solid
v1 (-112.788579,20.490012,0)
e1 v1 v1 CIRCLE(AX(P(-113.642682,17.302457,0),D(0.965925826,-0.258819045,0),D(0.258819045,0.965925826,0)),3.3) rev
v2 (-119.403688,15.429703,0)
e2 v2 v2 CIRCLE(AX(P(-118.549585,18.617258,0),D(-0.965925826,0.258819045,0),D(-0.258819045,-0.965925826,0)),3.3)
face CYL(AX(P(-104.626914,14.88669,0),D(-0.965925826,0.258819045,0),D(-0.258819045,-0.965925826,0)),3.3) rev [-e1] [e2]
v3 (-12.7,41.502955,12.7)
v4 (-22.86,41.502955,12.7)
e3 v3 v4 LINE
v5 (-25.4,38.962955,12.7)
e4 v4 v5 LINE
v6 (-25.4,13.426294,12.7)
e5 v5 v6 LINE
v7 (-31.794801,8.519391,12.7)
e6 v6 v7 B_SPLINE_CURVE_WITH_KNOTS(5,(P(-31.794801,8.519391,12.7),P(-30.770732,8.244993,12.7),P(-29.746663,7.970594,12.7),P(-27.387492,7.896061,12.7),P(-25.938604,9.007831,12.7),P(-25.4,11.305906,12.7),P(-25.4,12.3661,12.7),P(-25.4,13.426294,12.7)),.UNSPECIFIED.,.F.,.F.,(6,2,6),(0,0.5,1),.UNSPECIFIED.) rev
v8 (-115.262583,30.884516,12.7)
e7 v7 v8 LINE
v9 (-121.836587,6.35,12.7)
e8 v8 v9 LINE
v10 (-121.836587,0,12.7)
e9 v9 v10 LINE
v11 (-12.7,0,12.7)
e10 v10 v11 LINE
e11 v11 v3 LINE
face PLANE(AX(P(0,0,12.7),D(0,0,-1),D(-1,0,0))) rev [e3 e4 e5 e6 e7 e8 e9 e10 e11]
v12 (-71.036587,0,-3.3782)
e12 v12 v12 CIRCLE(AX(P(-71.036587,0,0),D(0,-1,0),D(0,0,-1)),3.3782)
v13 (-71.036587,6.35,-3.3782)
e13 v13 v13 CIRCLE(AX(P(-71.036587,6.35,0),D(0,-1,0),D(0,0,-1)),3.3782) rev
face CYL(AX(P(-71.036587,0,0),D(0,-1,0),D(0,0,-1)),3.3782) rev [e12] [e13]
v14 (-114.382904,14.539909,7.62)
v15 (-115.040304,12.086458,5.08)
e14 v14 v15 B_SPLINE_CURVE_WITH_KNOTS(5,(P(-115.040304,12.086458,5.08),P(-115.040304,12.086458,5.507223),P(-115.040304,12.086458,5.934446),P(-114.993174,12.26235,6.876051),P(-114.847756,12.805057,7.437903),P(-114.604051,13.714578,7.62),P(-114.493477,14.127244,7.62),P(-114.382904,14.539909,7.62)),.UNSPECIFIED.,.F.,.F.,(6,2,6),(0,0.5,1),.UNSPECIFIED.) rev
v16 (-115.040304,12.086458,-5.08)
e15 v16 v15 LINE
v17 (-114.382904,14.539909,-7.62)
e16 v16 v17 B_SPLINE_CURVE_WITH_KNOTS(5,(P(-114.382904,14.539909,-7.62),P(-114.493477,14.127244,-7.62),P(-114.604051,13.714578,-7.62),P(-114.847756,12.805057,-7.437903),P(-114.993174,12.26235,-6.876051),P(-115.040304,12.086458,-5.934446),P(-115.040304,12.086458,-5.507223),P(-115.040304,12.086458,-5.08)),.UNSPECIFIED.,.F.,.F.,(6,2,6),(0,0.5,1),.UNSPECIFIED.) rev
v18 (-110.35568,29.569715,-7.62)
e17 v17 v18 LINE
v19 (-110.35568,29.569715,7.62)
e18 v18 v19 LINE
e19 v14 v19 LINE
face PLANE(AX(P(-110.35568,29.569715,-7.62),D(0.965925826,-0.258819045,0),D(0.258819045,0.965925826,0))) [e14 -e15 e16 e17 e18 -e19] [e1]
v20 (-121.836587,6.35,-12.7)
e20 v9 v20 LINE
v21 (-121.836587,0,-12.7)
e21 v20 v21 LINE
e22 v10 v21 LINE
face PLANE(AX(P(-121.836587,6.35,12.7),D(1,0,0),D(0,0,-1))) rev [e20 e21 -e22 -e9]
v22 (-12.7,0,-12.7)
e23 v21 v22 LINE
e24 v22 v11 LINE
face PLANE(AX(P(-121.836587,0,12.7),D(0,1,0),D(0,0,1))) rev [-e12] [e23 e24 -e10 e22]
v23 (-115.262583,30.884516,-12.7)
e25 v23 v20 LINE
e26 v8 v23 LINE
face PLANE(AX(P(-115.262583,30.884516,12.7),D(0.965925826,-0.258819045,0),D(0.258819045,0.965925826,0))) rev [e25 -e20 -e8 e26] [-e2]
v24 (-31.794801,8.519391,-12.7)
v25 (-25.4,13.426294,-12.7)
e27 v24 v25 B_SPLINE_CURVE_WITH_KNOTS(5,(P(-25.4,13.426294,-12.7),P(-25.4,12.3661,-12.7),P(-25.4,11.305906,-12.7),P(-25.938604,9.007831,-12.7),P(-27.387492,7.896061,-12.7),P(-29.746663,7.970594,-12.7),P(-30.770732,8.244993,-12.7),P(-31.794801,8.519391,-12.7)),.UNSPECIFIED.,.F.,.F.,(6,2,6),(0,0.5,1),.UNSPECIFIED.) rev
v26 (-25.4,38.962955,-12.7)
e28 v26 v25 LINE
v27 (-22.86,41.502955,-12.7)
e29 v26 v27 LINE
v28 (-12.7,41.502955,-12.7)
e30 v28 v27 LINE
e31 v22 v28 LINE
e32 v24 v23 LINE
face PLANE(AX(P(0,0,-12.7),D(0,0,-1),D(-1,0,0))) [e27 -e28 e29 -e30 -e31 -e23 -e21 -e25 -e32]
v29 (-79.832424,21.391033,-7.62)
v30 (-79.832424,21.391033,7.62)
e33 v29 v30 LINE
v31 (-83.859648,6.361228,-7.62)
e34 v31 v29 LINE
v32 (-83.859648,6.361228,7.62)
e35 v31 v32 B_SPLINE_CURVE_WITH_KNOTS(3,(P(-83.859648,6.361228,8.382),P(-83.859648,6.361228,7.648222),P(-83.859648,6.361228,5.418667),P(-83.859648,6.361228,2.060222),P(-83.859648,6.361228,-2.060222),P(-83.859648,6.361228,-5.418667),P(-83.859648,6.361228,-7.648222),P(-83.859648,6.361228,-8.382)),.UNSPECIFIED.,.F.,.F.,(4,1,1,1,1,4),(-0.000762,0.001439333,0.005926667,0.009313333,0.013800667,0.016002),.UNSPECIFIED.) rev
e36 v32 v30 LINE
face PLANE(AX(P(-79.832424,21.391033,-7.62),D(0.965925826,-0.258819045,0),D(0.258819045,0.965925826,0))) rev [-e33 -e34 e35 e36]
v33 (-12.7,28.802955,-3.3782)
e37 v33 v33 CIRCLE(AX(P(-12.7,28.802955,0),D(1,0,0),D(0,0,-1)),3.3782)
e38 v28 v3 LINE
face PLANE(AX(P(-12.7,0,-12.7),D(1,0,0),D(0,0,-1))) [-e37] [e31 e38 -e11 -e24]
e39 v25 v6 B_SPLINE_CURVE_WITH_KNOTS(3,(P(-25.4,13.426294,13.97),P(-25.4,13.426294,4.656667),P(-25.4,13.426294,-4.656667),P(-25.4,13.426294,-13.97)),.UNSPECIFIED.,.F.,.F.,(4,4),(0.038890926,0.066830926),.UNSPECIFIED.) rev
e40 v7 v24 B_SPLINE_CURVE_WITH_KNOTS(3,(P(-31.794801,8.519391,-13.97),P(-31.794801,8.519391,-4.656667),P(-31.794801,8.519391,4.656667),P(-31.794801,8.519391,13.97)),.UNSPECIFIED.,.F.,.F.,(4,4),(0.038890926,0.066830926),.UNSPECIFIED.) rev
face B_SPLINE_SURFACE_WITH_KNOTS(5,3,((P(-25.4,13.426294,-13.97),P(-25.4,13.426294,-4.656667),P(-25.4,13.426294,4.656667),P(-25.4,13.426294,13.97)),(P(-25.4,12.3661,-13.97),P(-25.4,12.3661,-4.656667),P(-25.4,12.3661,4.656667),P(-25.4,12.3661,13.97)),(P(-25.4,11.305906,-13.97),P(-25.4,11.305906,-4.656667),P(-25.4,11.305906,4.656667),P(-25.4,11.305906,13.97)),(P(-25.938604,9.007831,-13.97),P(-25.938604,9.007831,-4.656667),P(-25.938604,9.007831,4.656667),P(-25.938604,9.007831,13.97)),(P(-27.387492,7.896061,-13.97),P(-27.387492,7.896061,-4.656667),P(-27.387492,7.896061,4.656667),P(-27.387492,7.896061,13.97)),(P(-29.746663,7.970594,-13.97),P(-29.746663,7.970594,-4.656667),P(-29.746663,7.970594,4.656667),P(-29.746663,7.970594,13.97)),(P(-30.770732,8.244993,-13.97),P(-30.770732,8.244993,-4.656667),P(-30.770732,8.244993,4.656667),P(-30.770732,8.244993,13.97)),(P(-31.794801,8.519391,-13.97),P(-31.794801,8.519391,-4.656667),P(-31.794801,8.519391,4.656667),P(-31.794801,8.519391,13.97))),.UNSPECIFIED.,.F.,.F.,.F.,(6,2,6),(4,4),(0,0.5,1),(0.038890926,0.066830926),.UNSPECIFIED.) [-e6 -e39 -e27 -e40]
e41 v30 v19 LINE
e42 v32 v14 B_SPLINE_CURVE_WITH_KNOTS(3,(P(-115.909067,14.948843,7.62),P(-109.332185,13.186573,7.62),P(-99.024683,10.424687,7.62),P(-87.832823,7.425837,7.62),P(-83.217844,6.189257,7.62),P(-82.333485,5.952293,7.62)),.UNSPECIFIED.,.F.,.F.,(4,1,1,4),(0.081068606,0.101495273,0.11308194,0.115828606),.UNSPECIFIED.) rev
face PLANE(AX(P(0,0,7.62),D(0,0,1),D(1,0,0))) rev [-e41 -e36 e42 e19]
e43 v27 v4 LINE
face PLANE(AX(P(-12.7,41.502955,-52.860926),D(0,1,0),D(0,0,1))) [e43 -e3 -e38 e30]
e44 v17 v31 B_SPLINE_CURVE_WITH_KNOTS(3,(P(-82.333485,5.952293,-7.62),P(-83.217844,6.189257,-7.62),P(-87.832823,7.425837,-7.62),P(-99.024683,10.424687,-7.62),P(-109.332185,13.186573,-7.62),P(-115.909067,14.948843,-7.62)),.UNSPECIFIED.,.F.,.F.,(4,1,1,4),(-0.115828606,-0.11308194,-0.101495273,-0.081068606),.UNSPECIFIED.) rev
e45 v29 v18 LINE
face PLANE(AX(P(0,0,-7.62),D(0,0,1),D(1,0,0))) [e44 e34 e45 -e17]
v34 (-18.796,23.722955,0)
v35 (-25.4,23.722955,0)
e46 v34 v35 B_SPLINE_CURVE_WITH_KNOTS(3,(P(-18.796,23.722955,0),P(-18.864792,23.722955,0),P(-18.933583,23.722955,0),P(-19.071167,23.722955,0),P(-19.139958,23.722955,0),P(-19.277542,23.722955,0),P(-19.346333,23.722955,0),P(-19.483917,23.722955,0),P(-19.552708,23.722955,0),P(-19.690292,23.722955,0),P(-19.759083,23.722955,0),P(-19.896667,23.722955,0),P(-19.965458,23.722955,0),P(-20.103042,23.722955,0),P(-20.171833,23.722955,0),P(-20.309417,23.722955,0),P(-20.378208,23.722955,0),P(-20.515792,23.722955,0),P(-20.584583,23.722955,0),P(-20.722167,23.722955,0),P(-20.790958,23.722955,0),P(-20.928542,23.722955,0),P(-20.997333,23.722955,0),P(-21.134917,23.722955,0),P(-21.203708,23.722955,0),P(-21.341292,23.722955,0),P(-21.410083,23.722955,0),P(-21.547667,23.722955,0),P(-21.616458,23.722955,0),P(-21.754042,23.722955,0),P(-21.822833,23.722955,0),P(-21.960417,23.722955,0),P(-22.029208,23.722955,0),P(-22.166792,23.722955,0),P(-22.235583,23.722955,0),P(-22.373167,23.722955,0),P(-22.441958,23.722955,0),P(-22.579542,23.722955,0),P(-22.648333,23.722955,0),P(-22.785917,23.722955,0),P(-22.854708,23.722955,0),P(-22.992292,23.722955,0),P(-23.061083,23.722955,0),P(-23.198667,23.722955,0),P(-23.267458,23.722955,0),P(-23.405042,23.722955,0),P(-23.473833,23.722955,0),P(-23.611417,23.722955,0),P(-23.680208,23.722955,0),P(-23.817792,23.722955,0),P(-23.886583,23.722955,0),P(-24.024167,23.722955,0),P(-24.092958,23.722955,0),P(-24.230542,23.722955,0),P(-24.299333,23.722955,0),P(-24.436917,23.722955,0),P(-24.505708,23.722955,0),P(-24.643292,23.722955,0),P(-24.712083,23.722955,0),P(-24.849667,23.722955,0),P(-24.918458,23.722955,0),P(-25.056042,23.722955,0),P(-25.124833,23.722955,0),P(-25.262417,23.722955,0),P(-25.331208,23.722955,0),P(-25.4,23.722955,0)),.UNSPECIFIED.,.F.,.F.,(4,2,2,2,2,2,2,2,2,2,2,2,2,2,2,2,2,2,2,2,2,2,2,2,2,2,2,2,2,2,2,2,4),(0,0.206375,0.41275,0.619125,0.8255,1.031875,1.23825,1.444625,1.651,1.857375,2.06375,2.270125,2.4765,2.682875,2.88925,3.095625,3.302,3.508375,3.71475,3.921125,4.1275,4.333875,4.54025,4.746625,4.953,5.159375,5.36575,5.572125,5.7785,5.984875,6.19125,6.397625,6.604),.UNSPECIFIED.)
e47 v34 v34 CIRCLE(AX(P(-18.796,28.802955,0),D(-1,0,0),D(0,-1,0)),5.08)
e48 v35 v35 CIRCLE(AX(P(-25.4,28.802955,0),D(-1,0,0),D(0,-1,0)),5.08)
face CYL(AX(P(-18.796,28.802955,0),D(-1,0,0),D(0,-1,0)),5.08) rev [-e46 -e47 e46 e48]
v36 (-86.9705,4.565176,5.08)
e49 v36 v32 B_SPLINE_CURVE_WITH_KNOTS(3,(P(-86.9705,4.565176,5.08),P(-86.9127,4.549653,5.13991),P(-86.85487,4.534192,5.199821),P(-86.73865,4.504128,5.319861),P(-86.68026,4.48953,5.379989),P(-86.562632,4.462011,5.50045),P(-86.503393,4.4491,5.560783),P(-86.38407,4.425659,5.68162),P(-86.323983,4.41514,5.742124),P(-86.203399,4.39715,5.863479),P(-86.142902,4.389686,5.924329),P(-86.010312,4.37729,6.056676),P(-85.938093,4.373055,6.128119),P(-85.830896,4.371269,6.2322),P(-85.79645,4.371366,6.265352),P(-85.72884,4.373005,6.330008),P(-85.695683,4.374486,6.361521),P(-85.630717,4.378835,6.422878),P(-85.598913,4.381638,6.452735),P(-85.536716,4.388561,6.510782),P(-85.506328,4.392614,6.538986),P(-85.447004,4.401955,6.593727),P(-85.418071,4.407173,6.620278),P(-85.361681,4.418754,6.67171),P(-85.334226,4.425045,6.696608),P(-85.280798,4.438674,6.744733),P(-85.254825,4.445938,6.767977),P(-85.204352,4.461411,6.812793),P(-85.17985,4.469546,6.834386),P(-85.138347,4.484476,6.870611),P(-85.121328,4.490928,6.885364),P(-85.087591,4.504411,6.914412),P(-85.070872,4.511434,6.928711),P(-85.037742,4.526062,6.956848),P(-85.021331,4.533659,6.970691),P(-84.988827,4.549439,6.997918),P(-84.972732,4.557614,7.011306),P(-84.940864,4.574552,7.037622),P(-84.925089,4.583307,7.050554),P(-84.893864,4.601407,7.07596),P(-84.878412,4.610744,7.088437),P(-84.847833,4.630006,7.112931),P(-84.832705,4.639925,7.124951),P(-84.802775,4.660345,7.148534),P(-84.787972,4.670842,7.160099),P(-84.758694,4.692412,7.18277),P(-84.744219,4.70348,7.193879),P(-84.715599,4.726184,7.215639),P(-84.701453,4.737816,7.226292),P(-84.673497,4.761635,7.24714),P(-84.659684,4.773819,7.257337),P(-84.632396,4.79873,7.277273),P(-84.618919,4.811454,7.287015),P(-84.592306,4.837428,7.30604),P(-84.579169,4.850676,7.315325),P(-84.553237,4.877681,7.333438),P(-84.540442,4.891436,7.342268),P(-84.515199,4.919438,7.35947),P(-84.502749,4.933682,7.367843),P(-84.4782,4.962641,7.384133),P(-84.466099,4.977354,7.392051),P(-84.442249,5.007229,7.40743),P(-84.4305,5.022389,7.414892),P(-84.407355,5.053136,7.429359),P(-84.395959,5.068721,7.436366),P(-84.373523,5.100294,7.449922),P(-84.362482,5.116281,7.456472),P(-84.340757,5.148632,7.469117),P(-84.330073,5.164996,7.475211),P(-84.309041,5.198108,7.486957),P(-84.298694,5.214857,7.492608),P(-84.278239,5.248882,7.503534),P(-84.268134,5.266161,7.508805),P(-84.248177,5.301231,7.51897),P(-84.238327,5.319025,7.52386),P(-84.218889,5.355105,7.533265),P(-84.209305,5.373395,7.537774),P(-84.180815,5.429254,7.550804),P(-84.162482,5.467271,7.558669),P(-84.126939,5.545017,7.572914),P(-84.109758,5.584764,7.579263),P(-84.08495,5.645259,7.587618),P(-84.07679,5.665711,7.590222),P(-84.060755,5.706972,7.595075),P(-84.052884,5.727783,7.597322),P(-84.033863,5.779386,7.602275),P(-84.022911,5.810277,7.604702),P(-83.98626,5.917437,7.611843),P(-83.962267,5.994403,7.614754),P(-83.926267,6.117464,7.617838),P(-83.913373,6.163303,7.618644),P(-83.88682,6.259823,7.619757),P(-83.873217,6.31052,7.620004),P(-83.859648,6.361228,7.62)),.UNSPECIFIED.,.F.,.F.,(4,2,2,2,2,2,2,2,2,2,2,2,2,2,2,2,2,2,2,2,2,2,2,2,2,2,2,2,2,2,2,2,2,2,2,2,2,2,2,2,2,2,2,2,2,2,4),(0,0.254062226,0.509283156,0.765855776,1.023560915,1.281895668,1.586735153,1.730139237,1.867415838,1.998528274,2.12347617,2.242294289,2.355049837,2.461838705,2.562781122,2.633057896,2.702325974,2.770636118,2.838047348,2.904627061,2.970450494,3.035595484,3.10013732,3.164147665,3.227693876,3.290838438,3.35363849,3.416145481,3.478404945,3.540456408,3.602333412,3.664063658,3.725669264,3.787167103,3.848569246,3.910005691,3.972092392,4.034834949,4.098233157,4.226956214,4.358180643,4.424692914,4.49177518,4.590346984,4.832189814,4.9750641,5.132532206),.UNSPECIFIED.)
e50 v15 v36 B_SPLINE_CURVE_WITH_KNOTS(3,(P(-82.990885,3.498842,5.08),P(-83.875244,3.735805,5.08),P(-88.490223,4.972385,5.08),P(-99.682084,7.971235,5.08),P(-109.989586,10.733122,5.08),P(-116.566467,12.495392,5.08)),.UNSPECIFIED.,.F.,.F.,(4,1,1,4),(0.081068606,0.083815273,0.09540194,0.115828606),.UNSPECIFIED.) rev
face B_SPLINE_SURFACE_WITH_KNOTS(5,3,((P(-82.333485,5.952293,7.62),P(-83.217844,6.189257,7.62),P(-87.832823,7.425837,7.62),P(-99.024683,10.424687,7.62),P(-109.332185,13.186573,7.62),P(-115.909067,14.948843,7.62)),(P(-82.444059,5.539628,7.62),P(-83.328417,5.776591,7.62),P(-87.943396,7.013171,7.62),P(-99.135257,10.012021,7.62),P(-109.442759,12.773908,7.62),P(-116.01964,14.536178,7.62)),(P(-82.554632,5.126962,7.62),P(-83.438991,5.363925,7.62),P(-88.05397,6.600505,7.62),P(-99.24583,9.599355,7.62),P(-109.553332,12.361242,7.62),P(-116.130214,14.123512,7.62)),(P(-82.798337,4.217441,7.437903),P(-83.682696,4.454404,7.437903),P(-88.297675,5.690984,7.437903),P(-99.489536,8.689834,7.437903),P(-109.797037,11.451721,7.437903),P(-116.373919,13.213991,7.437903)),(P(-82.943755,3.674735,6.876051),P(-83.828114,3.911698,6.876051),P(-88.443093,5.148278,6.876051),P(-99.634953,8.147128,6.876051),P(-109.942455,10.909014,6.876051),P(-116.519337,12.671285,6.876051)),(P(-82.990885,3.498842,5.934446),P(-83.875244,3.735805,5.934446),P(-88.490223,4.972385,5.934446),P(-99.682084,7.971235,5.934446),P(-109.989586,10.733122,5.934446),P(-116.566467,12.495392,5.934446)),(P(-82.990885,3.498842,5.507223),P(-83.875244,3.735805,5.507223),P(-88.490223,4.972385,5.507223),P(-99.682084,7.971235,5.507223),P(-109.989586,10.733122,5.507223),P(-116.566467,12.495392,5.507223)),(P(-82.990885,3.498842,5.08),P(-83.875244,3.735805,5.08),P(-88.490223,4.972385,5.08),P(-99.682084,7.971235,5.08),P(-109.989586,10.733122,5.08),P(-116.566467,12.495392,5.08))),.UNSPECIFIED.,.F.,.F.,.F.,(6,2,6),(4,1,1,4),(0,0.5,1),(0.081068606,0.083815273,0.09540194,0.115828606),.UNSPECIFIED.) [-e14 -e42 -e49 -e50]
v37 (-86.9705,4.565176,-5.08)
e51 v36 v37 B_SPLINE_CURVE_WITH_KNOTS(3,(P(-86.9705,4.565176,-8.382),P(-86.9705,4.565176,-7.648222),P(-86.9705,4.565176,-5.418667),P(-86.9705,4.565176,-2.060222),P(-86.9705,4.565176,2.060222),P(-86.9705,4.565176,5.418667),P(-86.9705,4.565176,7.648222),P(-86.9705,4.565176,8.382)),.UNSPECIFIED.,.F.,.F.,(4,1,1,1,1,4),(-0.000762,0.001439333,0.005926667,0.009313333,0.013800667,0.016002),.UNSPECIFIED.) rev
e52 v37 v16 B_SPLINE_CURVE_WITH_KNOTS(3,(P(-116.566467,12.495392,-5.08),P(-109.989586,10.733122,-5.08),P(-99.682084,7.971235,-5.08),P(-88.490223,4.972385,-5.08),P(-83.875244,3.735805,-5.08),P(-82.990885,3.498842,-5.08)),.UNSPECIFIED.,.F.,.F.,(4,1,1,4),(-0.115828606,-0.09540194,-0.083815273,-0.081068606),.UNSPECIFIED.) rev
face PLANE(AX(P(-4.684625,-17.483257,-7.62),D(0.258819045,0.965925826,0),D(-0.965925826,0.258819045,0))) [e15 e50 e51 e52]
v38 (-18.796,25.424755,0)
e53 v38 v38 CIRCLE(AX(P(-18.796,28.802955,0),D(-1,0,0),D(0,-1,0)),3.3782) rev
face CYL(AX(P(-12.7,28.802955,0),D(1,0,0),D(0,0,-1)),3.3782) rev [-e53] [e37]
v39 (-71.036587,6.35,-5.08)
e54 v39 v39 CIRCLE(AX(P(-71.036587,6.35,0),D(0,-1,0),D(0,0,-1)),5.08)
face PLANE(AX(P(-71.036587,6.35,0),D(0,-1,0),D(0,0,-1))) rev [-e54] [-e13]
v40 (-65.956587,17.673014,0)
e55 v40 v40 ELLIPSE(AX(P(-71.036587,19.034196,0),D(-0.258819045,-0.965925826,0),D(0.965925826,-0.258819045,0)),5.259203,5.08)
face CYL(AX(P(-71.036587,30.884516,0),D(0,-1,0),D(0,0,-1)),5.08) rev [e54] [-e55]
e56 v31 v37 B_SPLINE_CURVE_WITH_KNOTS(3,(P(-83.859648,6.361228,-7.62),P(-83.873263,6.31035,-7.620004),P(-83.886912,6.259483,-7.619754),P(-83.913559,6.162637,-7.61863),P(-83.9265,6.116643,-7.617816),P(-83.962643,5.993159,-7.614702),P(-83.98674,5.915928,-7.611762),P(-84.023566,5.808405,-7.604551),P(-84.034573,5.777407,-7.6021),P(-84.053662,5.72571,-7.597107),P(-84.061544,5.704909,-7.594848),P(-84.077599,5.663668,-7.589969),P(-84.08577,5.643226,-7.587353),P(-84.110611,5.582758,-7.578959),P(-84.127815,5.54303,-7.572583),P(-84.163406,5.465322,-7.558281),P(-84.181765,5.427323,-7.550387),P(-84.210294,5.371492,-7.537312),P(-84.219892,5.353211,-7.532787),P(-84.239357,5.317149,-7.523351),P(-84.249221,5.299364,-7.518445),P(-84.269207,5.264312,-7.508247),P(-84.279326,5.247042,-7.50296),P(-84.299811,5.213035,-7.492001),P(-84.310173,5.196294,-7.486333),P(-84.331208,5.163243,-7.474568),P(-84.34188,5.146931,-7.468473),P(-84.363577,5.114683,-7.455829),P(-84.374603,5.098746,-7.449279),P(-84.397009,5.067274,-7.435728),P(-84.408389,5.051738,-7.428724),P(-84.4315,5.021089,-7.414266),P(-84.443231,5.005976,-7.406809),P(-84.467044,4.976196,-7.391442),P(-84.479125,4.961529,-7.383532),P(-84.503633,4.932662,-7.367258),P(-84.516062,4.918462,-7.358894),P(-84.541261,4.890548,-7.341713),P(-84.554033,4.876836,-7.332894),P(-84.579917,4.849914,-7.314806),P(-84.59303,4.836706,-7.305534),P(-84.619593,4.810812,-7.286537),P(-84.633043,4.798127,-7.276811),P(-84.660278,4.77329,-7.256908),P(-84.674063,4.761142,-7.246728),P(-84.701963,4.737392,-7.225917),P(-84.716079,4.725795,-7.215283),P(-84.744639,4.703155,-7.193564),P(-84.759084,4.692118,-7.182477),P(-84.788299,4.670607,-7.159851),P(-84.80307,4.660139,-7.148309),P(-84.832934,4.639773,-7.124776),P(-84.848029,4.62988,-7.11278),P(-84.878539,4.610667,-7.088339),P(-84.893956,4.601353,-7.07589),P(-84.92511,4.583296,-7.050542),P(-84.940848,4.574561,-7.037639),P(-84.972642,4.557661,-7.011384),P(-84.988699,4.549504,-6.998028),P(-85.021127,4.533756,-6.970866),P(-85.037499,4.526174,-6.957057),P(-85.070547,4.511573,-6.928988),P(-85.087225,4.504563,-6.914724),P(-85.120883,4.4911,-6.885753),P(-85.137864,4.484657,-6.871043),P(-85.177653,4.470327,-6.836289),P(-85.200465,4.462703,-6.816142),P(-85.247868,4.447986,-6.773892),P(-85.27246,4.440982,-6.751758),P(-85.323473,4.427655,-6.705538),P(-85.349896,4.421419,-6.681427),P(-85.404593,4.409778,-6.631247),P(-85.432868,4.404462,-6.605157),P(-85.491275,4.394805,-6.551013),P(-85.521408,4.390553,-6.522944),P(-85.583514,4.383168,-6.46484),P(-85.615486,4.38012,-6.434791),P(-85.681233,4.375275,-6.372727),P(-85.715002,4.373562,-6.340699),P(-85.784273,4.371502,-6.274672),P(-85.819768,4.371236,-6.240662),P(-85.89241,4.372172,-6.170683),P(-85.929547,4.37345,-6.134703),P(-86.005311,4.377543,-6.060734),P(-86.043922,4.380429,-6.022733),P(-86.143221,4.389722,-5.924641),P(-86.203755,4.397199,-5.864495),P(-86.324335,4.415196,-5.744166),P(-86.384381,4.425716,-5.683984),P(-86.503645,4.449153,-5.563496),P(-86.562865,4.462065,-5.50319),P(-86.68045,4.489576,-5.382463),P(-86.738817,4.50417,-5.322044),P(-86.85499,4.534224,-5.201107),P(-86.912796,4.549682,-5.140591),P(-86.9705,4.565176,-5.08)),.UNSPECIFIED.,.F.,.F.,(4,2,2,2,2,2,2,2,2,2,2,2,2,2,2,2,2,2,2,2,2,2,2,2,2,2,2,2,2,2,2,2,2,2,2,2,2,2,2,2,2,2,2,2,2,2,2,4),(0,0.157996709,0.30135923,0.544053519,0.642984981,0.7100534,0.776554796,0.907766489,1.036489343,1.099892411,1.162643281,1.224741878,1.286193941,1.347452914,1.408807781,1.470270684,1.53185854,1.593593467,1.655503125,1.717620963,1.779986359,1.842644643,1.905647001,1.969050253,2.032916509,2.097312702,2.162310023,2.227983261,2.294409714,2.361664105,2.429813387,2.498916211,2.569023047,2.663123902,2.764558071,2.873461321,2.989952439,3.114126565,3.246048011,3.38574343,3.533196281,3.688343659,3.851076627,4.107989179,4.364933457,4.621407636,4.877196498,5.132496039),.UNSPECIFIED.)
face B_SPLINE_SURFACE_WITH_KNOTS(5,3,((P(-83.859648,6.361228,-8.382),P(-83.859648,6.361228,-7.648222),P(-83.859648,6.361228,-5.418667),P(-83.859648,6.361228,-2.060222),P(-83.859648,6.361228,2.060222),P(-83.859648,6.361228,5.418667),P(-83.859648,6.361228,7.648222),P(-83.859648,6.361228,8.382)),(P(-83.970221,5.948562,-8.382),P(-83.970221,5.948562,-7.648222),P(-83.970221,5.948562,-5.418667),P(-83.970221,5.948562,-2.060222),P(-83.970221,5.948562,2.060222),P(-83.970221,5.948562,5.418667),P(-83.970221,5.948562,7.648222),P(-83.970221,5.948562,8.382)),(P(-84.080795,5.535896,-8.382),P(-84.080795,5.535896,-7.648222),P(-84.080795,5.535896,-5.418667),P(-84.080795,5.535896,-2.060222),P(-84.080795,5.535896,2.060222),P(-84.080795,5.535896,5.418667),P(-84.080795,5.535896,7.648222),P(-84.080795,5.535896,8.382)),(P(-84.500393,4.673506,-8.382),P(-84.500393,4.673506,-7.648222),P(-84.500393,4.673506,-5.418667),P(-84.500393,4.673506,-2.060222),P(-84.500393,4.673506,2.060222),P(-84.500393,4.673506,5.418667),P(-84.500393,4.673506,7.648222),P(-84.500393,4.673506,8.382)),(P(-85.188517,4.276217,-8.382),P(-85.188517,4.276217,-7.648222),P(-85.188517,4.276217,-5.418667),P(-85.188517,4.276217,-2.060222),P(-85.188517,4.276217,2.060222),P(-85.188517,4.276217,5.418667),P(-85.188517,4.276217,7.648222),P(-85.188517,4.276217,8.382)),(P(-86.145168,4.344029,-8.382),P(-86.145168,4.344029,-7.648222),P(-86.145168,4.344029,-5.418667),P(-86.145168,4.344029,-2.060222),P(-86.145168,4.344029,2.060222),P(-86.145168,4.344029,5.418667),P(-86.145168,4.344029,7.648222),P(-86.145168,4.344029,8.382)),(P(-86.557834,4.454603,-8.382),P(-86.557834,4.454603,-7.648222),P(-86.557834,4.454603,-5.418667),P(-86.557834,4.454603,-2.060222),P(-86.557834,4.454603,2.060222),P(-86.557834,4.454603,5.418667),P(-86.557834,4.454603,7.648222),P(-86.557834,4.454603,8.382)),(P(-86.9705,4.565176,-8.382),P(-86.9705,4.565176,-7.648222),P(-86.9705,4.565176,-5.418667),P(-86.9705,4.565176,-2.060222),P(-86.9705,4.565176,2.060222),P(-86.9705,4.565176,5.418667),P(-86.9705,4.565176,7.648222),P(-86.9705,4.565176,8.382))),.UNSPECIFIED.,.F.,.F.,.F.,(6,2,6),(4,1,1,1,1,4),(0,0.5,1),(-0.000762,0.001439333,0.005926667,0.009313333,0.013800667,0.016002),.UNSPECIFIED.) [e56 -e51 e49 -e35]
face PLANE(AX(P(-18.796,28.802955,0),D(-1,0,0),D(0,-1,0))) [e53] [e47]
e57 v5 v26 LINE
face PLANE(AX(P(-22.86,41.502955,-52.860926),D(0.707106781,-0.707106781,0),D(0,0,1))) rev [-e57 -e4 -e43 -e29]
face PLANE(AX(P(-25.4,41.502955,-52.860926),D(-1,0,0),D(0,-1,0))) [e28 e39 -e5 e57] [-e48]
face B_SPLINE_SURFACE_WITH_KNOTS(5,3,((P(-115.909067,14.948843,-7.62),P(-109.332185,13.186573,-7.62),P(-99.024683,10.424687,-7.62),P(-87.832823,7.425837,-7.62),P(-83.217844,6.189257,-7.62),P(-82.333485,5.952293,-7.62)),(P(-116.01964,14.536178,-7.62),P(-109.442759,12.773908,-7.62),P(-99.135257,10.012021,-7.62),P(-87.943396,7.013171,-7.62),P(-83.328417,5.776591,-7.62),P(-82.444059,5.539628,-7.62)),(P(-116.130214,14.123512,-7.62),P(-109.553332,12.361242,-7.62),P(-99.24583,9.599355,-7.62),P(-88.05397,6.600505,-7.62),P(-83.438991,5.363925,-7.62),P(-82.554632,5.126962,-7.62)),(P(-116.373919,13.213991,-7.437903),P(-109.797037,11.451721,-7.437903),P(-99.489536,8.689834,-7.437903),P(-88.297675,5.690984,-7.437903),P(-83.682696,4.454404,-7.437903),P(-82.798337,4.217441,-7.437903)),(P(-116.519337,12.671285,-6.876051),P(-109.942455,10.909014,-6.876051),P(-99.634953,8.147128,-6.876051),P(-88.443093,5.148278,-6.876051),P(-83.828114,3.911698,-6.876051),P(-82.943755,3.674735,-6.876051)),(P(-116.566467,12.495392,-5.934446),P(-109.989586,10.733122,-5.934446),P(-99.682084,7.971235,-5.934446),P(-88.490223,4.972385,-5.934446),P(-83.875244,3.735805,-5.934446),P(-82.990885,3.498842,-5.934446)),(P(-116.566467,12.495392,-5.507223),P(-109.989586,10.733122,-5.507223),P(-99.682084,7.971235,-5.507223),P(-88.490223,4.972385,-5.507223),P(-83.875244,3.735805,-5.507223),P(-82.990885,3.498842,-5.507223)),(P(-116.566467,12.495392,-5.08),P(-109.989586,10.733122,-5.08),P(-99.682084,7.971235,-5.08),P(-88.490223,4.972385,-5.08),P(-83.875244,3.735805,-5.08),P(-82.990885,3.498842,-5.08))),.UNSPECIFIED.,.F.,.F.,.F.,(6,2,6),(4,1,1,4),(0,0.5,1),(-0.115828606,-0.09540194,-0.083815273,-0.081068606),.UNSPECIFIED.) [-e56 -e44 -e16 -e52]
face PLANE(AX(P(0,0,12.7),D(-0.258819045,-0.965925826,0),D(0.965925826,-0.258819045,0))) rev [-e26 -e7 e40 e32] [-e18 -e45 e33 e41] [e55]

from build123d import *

# Parameters (mm, degrees)
BOSS_EXTRUDE2_DEPTH         = 12.7
CUT_EXTRUDE1_DEPTH          = 7.62
SKETCH3_R                   = 3.3
CUT_EXTRUDE3_DEPTH          = 5.08
FILLET1_SIZE                = 2.54
F_1_4_CLEARANCE_HOLE1_D     = 6.7564
SKETCH8_R                   = 5.08
CUT_EXTRUDE4_DEPTH          = 125.929525349
CUT_EXTRUDE5_DEPTH          = 129.230913422
BOSS_EXTRUDE3_DEPTH         = 25.4
F_1_4_CLEARANCE_HOLE2_D     = 6.7564
F_1_4_CLEARANCE_HOLE2_DEPTH = 12.7
F_1_4_CLEARANCE_HOLE2_TIP   = 2.029827343
SKETCH14_R                  = 5.08
CUT_EXTRUDE6_DEPTH          = 6.604
CHAMFER1_SIZE               = 2.54


with BuildPart() as part:
    # Sketch1 → Boss-Extrude2 (new, symmetric)
    with BuildSketch(Plane.XY):
        Polygon((-121.836586579, 6.35), (-121.836586579, 0), (0, 0), (-115.262582833, 30.884515988), align=None)
    extrude(amount=BOSS_EXTRUDE2_DEPTH, both=True)

    # Sketch2 → Cut-Extrude1 (cut, symmetric)
    with BuildSketch(Plane.XY):
        Polygon((-112.78857866, 20.490012472), (-112.245058665, 22.518456707), (-106.256318542, 20.913778627), (-109.051564229, 10.481779703), (-115.040304352, 12.086457783), (-114.496784358, 14.114902018), align=None)
        Polygon((-79.832423525, 21.391033413), (-110.355679636, 29.569715239), (-112.245058665, 22.518456707), (-106.256318542, 20.913778627), (-109.051564229, 10.481779703), (-84.517048242, 3.907775958), align=None)
    extrude(amount=CUT_EXTRUDE1_DEPTH, both=True, mode=Mode.SUBTRACT)

    # Sketch3 → Cut-Extrude3 (cut)
    with BuildSketch(Plane(origin=(-115.262582833, 30.884515988, 0), x_dir=(0, 0, 1), z_dir=(-0.96592582628907, 0.25881904510251447, 0))):
        with Locations(Location((0, -12.7, 0), (0, 0, 270))):
            Circle(SKETCH3_R)
    extrude(amount=-CUT_EXTRUDE3_DEPTH, mode=Mode.SUBTRACT)

    # Fillet1
    # a fillet whose section is not a circle: 2.54 mm, written as the material it adds along each edge
    with BuildSketch(Plane(origin=(-84.517048242, 3.907775958, 7.62), x_dir=(0.25881904510251297, 0.9659258262890703, 0), z_dir=(0, 0, -1))) as fillet1_piece_1:
        with BuildLine():
            add(Edge.make_bspline([(FILLET1_SIZE, 0), (FILLET1_SIZE * 0.831801948466, 0), (FILLET1_SIZE * 0.663603896932, 0), (FILLET1_SIZE * 0.292893218813, -FILLET1_SIZE * 0.0716919198361), (FILLET1_SIZE * 0.0716919198361, -FILLET1_SIZE * 0.292893218813), (0, -FILLET1_SIZE * 0.663603896932), (0, -FILLET1_SIZE * 0.831801948466), (0, -FILLET1_SIZE)], knots=[0, 0, 0, 0, 0, 0, 0.5, 0.5, 1, 1, 1, 1, 1, 1], degree=5))
            Line((0, -FILLET1_SIZE), (0, 0))
            Line((0, 0), (FILLET1_SIZE, 0))
        make_face()
    extrude(amount=15.24)
    with BuildSketch(Plane(origin=(-115.040304352, 12.086457783, 7.62), x_dir=(0.25881904510251585, 0.9659258262890695, 0), z_dir=(0.9659258262890696, -0.2588190451025158, 0))) as fillet1_piece_2:
        with BuildLine():
            add(Edge.make_bspline([(FILLET1_SIZE, 0), (FILLET1_SIZE * 0.831801948466, 0), (FILLET1_SIZE * 0.663603896932, 0), (FILLET1_SIZE * 0.292893218813, -FILLET1_SIZE * 0.0716919198361), (FILLET1_SIZE * 0.0716919198361, -FILLET1_SIZE * 0.292893218813), (0, -FILLET1_SIZE * 0.663603896932), (0, -FILLET1_SIZE * 0.831801948466), (0, -FILLET1_SIZE)], knots=[0, 0, 0, 0, 0, 0, 0.5, 0.5, 1, 1, 1, 1, 1, 1], degree=5))
            Line((0, -FILLET1_SIZE), (0, 0))
            Line((0, 0), (FILLET1_SIZE, 0))
        make_face()
    extrude(amount=37.95)
    with BuildSketch(Plane(origin=(-115.040304352, 12.086457783, -7.62), x_dir=(0.25881904510251585, 0.9659258262890695, 0), z_dir=(0.9659258262890696, -0.2588190451025158, 0))) as fillet1_piece_3:
        with BuildLine():
            add(Edge.make_bspline([(FILLET1_SIZE, 0), (FILLET1_SIZE * 0.831801948466, 0), (FILLET1_SIZE * 0.663603896932, 0), (FILLET1_SIZE * 0.292893218813, FILLET1_SIZE * 0.0716919198361), (FILLET1_SIZE * 0.0716919198361, FILLET1_SIZE * 0.292893218813), (0, FILLET1_SIZE * 0.663603896932), (0, FILLET1_SIZE * 0.831801948466), (0, FILLET1_SIZE)], knots=[0, 0, 0, 0, 0, 0, 0.5, 0.5, 1, 1, 1, 1, 1, 1], degree=5))
            Line((0, FILLET1_SIZE), (0, 0))
            Line((0, 0), (FILLET1_SIZE, 0))
        make_face()
    extrude(amount=37.95)

    # 1/4 Clearance Hole1 (through all)
    with Locations(Plane(origin=(0, 0, 0), x_dir=(-1, 0, 0), z_dir=(0, -1, 0))):
        with Locations((71.036586579, 0)):
            Hole(F_1_4_CLEARANCE_HOLE1_D / 2)

    # Sketch8 → Cut-Extrude4 (cut, through all)
    with BuildSketch(Plane(origin=(0, 6.35, 0), x_dir=(-1, 0, 0), z_dir=(0, -1, 0))):
        with Locations(Location((71.036586579, 0, 0), (0, 0, 90))):
            Circle(SKETCH8_R)
    extrude(amount=-CUT_EXTRUDE4_DEPTH, mode=Mode.SUBTRACT)

    # Sketch9 → Cut-Extrude5 (cut, through all)
    with BuildSketch(Plane.XY.offset(12.7)):
        Polygon((-12.7, 3.402954744), (-12.7, 0), (0, 0), align=None)
    extrude(amount=-CUT_EXTRUDE5_DEPTH, mode=Mode.SUBTRACT)

    # Sketch10 → Boss-Extrude3 (add)
    with BuildSketch(Plane.XY.offset(12.7)):
        Polygon((-12.7, 3.402954744), (-12.7, 41.502954744), (-25.4, 41.502954744), (-25.4, 6.805909488), align=None)
    extrude(amount=-BOSS_EXTRUDE3_DEPTH)

    # 1/4 Clearance Hole2
    with Locations(Plane(origin=(-12.7, 0, 0), x_dir=(0, 0, -1), z_dir=(1, 0, 0))):
        with Locations((0, 28.802954744)):
            Hole(F_1_4_CLEARANCE_HOLE2_D / 2, depth=F_1_4_CLEARANCE_HOLE2_DEPTH)
            with Locations((0, 0, -(F_1_4_CLEARANCE_HOLE2_DEPTH + F_1_4_CLEARANCE_HOLE2_TIP / 2))):  # 118° drill point
                Cone(0, F_1_4_CLEARANCE_HOLE2_D / 2, F_1_4_CLEARANCE_HOLE2_TIP, mode=Mode.SUBTRACT)

    # Sketch14 → Cut-Extrude6 (cut)
    with BuildSketch(Plane.ZY.offset(25.4)):
        with Locations(Location((0, 28.802954744, 0), (0, 0, 270))):
            Circle(SKETCH14_R)
    extrude(amount=-CUT_EXTRUDE6_DEPTH, mode=Mode.SUBTRACT)

    # Chamfer1
    chamfer1_edges = [part.edges().sort_by_distance(p)[0] for p in [
        (-25.4, 41.502954744, 0),
    ]]
    chamfer(chamfer1_edges, length=CHAMFER1_SIZE)

    # Fillet2
    # a fillet whose section is not a circle: 5.08 mm, written as the material it adds along each edge (its section moved 0.00015 mm through the faces so that the kernel can cut it)
    with BuildSketch(Plane(origin=(-25.4, 6.805909488, 12.7), x_dir=(2.2657292946534733e-05, 0.9999999997433235, 0), z_dir=(0, 0, -1))) as fillet2_piece_1:
        with BuildLine():
            add(Edge.make_bspline([(6.620384896, 0), (5.560159502, 2.4022e-05), (4.499934108, 4.8044e-05), (2.201778974, -0.538520049), (1.089942696, -1.987425322), (1.164425276, -4.346667776), (1.438808597, -5.370773083), (1.713191917, -6.39487839)], knots=[0, 0, 0, 0, 0, 0, 0.5, 0.5, 1, 1, 1, 1, 1, 1], degree=5))
            Line((1.713191917, -6.39487839), (1.615053258, -6.421172181))
            ThreePointArc((1.615053258, -6.421172181), (0.758529744, -3.223713577), (-0.09813866, -0.026293791))
            Line((-0.09813866, -0.026293791), (2.302e-06, 0.1016))
            ThreePointArc((2.302e-06, 0.1016), (3.310194748, 0.101525), (6.620387198, 0.1016))
            Line((6.620387198, 0.1016), (6.620384896, 0))
        make_face()
    extrude(amount=25.4)


solid = part.part
